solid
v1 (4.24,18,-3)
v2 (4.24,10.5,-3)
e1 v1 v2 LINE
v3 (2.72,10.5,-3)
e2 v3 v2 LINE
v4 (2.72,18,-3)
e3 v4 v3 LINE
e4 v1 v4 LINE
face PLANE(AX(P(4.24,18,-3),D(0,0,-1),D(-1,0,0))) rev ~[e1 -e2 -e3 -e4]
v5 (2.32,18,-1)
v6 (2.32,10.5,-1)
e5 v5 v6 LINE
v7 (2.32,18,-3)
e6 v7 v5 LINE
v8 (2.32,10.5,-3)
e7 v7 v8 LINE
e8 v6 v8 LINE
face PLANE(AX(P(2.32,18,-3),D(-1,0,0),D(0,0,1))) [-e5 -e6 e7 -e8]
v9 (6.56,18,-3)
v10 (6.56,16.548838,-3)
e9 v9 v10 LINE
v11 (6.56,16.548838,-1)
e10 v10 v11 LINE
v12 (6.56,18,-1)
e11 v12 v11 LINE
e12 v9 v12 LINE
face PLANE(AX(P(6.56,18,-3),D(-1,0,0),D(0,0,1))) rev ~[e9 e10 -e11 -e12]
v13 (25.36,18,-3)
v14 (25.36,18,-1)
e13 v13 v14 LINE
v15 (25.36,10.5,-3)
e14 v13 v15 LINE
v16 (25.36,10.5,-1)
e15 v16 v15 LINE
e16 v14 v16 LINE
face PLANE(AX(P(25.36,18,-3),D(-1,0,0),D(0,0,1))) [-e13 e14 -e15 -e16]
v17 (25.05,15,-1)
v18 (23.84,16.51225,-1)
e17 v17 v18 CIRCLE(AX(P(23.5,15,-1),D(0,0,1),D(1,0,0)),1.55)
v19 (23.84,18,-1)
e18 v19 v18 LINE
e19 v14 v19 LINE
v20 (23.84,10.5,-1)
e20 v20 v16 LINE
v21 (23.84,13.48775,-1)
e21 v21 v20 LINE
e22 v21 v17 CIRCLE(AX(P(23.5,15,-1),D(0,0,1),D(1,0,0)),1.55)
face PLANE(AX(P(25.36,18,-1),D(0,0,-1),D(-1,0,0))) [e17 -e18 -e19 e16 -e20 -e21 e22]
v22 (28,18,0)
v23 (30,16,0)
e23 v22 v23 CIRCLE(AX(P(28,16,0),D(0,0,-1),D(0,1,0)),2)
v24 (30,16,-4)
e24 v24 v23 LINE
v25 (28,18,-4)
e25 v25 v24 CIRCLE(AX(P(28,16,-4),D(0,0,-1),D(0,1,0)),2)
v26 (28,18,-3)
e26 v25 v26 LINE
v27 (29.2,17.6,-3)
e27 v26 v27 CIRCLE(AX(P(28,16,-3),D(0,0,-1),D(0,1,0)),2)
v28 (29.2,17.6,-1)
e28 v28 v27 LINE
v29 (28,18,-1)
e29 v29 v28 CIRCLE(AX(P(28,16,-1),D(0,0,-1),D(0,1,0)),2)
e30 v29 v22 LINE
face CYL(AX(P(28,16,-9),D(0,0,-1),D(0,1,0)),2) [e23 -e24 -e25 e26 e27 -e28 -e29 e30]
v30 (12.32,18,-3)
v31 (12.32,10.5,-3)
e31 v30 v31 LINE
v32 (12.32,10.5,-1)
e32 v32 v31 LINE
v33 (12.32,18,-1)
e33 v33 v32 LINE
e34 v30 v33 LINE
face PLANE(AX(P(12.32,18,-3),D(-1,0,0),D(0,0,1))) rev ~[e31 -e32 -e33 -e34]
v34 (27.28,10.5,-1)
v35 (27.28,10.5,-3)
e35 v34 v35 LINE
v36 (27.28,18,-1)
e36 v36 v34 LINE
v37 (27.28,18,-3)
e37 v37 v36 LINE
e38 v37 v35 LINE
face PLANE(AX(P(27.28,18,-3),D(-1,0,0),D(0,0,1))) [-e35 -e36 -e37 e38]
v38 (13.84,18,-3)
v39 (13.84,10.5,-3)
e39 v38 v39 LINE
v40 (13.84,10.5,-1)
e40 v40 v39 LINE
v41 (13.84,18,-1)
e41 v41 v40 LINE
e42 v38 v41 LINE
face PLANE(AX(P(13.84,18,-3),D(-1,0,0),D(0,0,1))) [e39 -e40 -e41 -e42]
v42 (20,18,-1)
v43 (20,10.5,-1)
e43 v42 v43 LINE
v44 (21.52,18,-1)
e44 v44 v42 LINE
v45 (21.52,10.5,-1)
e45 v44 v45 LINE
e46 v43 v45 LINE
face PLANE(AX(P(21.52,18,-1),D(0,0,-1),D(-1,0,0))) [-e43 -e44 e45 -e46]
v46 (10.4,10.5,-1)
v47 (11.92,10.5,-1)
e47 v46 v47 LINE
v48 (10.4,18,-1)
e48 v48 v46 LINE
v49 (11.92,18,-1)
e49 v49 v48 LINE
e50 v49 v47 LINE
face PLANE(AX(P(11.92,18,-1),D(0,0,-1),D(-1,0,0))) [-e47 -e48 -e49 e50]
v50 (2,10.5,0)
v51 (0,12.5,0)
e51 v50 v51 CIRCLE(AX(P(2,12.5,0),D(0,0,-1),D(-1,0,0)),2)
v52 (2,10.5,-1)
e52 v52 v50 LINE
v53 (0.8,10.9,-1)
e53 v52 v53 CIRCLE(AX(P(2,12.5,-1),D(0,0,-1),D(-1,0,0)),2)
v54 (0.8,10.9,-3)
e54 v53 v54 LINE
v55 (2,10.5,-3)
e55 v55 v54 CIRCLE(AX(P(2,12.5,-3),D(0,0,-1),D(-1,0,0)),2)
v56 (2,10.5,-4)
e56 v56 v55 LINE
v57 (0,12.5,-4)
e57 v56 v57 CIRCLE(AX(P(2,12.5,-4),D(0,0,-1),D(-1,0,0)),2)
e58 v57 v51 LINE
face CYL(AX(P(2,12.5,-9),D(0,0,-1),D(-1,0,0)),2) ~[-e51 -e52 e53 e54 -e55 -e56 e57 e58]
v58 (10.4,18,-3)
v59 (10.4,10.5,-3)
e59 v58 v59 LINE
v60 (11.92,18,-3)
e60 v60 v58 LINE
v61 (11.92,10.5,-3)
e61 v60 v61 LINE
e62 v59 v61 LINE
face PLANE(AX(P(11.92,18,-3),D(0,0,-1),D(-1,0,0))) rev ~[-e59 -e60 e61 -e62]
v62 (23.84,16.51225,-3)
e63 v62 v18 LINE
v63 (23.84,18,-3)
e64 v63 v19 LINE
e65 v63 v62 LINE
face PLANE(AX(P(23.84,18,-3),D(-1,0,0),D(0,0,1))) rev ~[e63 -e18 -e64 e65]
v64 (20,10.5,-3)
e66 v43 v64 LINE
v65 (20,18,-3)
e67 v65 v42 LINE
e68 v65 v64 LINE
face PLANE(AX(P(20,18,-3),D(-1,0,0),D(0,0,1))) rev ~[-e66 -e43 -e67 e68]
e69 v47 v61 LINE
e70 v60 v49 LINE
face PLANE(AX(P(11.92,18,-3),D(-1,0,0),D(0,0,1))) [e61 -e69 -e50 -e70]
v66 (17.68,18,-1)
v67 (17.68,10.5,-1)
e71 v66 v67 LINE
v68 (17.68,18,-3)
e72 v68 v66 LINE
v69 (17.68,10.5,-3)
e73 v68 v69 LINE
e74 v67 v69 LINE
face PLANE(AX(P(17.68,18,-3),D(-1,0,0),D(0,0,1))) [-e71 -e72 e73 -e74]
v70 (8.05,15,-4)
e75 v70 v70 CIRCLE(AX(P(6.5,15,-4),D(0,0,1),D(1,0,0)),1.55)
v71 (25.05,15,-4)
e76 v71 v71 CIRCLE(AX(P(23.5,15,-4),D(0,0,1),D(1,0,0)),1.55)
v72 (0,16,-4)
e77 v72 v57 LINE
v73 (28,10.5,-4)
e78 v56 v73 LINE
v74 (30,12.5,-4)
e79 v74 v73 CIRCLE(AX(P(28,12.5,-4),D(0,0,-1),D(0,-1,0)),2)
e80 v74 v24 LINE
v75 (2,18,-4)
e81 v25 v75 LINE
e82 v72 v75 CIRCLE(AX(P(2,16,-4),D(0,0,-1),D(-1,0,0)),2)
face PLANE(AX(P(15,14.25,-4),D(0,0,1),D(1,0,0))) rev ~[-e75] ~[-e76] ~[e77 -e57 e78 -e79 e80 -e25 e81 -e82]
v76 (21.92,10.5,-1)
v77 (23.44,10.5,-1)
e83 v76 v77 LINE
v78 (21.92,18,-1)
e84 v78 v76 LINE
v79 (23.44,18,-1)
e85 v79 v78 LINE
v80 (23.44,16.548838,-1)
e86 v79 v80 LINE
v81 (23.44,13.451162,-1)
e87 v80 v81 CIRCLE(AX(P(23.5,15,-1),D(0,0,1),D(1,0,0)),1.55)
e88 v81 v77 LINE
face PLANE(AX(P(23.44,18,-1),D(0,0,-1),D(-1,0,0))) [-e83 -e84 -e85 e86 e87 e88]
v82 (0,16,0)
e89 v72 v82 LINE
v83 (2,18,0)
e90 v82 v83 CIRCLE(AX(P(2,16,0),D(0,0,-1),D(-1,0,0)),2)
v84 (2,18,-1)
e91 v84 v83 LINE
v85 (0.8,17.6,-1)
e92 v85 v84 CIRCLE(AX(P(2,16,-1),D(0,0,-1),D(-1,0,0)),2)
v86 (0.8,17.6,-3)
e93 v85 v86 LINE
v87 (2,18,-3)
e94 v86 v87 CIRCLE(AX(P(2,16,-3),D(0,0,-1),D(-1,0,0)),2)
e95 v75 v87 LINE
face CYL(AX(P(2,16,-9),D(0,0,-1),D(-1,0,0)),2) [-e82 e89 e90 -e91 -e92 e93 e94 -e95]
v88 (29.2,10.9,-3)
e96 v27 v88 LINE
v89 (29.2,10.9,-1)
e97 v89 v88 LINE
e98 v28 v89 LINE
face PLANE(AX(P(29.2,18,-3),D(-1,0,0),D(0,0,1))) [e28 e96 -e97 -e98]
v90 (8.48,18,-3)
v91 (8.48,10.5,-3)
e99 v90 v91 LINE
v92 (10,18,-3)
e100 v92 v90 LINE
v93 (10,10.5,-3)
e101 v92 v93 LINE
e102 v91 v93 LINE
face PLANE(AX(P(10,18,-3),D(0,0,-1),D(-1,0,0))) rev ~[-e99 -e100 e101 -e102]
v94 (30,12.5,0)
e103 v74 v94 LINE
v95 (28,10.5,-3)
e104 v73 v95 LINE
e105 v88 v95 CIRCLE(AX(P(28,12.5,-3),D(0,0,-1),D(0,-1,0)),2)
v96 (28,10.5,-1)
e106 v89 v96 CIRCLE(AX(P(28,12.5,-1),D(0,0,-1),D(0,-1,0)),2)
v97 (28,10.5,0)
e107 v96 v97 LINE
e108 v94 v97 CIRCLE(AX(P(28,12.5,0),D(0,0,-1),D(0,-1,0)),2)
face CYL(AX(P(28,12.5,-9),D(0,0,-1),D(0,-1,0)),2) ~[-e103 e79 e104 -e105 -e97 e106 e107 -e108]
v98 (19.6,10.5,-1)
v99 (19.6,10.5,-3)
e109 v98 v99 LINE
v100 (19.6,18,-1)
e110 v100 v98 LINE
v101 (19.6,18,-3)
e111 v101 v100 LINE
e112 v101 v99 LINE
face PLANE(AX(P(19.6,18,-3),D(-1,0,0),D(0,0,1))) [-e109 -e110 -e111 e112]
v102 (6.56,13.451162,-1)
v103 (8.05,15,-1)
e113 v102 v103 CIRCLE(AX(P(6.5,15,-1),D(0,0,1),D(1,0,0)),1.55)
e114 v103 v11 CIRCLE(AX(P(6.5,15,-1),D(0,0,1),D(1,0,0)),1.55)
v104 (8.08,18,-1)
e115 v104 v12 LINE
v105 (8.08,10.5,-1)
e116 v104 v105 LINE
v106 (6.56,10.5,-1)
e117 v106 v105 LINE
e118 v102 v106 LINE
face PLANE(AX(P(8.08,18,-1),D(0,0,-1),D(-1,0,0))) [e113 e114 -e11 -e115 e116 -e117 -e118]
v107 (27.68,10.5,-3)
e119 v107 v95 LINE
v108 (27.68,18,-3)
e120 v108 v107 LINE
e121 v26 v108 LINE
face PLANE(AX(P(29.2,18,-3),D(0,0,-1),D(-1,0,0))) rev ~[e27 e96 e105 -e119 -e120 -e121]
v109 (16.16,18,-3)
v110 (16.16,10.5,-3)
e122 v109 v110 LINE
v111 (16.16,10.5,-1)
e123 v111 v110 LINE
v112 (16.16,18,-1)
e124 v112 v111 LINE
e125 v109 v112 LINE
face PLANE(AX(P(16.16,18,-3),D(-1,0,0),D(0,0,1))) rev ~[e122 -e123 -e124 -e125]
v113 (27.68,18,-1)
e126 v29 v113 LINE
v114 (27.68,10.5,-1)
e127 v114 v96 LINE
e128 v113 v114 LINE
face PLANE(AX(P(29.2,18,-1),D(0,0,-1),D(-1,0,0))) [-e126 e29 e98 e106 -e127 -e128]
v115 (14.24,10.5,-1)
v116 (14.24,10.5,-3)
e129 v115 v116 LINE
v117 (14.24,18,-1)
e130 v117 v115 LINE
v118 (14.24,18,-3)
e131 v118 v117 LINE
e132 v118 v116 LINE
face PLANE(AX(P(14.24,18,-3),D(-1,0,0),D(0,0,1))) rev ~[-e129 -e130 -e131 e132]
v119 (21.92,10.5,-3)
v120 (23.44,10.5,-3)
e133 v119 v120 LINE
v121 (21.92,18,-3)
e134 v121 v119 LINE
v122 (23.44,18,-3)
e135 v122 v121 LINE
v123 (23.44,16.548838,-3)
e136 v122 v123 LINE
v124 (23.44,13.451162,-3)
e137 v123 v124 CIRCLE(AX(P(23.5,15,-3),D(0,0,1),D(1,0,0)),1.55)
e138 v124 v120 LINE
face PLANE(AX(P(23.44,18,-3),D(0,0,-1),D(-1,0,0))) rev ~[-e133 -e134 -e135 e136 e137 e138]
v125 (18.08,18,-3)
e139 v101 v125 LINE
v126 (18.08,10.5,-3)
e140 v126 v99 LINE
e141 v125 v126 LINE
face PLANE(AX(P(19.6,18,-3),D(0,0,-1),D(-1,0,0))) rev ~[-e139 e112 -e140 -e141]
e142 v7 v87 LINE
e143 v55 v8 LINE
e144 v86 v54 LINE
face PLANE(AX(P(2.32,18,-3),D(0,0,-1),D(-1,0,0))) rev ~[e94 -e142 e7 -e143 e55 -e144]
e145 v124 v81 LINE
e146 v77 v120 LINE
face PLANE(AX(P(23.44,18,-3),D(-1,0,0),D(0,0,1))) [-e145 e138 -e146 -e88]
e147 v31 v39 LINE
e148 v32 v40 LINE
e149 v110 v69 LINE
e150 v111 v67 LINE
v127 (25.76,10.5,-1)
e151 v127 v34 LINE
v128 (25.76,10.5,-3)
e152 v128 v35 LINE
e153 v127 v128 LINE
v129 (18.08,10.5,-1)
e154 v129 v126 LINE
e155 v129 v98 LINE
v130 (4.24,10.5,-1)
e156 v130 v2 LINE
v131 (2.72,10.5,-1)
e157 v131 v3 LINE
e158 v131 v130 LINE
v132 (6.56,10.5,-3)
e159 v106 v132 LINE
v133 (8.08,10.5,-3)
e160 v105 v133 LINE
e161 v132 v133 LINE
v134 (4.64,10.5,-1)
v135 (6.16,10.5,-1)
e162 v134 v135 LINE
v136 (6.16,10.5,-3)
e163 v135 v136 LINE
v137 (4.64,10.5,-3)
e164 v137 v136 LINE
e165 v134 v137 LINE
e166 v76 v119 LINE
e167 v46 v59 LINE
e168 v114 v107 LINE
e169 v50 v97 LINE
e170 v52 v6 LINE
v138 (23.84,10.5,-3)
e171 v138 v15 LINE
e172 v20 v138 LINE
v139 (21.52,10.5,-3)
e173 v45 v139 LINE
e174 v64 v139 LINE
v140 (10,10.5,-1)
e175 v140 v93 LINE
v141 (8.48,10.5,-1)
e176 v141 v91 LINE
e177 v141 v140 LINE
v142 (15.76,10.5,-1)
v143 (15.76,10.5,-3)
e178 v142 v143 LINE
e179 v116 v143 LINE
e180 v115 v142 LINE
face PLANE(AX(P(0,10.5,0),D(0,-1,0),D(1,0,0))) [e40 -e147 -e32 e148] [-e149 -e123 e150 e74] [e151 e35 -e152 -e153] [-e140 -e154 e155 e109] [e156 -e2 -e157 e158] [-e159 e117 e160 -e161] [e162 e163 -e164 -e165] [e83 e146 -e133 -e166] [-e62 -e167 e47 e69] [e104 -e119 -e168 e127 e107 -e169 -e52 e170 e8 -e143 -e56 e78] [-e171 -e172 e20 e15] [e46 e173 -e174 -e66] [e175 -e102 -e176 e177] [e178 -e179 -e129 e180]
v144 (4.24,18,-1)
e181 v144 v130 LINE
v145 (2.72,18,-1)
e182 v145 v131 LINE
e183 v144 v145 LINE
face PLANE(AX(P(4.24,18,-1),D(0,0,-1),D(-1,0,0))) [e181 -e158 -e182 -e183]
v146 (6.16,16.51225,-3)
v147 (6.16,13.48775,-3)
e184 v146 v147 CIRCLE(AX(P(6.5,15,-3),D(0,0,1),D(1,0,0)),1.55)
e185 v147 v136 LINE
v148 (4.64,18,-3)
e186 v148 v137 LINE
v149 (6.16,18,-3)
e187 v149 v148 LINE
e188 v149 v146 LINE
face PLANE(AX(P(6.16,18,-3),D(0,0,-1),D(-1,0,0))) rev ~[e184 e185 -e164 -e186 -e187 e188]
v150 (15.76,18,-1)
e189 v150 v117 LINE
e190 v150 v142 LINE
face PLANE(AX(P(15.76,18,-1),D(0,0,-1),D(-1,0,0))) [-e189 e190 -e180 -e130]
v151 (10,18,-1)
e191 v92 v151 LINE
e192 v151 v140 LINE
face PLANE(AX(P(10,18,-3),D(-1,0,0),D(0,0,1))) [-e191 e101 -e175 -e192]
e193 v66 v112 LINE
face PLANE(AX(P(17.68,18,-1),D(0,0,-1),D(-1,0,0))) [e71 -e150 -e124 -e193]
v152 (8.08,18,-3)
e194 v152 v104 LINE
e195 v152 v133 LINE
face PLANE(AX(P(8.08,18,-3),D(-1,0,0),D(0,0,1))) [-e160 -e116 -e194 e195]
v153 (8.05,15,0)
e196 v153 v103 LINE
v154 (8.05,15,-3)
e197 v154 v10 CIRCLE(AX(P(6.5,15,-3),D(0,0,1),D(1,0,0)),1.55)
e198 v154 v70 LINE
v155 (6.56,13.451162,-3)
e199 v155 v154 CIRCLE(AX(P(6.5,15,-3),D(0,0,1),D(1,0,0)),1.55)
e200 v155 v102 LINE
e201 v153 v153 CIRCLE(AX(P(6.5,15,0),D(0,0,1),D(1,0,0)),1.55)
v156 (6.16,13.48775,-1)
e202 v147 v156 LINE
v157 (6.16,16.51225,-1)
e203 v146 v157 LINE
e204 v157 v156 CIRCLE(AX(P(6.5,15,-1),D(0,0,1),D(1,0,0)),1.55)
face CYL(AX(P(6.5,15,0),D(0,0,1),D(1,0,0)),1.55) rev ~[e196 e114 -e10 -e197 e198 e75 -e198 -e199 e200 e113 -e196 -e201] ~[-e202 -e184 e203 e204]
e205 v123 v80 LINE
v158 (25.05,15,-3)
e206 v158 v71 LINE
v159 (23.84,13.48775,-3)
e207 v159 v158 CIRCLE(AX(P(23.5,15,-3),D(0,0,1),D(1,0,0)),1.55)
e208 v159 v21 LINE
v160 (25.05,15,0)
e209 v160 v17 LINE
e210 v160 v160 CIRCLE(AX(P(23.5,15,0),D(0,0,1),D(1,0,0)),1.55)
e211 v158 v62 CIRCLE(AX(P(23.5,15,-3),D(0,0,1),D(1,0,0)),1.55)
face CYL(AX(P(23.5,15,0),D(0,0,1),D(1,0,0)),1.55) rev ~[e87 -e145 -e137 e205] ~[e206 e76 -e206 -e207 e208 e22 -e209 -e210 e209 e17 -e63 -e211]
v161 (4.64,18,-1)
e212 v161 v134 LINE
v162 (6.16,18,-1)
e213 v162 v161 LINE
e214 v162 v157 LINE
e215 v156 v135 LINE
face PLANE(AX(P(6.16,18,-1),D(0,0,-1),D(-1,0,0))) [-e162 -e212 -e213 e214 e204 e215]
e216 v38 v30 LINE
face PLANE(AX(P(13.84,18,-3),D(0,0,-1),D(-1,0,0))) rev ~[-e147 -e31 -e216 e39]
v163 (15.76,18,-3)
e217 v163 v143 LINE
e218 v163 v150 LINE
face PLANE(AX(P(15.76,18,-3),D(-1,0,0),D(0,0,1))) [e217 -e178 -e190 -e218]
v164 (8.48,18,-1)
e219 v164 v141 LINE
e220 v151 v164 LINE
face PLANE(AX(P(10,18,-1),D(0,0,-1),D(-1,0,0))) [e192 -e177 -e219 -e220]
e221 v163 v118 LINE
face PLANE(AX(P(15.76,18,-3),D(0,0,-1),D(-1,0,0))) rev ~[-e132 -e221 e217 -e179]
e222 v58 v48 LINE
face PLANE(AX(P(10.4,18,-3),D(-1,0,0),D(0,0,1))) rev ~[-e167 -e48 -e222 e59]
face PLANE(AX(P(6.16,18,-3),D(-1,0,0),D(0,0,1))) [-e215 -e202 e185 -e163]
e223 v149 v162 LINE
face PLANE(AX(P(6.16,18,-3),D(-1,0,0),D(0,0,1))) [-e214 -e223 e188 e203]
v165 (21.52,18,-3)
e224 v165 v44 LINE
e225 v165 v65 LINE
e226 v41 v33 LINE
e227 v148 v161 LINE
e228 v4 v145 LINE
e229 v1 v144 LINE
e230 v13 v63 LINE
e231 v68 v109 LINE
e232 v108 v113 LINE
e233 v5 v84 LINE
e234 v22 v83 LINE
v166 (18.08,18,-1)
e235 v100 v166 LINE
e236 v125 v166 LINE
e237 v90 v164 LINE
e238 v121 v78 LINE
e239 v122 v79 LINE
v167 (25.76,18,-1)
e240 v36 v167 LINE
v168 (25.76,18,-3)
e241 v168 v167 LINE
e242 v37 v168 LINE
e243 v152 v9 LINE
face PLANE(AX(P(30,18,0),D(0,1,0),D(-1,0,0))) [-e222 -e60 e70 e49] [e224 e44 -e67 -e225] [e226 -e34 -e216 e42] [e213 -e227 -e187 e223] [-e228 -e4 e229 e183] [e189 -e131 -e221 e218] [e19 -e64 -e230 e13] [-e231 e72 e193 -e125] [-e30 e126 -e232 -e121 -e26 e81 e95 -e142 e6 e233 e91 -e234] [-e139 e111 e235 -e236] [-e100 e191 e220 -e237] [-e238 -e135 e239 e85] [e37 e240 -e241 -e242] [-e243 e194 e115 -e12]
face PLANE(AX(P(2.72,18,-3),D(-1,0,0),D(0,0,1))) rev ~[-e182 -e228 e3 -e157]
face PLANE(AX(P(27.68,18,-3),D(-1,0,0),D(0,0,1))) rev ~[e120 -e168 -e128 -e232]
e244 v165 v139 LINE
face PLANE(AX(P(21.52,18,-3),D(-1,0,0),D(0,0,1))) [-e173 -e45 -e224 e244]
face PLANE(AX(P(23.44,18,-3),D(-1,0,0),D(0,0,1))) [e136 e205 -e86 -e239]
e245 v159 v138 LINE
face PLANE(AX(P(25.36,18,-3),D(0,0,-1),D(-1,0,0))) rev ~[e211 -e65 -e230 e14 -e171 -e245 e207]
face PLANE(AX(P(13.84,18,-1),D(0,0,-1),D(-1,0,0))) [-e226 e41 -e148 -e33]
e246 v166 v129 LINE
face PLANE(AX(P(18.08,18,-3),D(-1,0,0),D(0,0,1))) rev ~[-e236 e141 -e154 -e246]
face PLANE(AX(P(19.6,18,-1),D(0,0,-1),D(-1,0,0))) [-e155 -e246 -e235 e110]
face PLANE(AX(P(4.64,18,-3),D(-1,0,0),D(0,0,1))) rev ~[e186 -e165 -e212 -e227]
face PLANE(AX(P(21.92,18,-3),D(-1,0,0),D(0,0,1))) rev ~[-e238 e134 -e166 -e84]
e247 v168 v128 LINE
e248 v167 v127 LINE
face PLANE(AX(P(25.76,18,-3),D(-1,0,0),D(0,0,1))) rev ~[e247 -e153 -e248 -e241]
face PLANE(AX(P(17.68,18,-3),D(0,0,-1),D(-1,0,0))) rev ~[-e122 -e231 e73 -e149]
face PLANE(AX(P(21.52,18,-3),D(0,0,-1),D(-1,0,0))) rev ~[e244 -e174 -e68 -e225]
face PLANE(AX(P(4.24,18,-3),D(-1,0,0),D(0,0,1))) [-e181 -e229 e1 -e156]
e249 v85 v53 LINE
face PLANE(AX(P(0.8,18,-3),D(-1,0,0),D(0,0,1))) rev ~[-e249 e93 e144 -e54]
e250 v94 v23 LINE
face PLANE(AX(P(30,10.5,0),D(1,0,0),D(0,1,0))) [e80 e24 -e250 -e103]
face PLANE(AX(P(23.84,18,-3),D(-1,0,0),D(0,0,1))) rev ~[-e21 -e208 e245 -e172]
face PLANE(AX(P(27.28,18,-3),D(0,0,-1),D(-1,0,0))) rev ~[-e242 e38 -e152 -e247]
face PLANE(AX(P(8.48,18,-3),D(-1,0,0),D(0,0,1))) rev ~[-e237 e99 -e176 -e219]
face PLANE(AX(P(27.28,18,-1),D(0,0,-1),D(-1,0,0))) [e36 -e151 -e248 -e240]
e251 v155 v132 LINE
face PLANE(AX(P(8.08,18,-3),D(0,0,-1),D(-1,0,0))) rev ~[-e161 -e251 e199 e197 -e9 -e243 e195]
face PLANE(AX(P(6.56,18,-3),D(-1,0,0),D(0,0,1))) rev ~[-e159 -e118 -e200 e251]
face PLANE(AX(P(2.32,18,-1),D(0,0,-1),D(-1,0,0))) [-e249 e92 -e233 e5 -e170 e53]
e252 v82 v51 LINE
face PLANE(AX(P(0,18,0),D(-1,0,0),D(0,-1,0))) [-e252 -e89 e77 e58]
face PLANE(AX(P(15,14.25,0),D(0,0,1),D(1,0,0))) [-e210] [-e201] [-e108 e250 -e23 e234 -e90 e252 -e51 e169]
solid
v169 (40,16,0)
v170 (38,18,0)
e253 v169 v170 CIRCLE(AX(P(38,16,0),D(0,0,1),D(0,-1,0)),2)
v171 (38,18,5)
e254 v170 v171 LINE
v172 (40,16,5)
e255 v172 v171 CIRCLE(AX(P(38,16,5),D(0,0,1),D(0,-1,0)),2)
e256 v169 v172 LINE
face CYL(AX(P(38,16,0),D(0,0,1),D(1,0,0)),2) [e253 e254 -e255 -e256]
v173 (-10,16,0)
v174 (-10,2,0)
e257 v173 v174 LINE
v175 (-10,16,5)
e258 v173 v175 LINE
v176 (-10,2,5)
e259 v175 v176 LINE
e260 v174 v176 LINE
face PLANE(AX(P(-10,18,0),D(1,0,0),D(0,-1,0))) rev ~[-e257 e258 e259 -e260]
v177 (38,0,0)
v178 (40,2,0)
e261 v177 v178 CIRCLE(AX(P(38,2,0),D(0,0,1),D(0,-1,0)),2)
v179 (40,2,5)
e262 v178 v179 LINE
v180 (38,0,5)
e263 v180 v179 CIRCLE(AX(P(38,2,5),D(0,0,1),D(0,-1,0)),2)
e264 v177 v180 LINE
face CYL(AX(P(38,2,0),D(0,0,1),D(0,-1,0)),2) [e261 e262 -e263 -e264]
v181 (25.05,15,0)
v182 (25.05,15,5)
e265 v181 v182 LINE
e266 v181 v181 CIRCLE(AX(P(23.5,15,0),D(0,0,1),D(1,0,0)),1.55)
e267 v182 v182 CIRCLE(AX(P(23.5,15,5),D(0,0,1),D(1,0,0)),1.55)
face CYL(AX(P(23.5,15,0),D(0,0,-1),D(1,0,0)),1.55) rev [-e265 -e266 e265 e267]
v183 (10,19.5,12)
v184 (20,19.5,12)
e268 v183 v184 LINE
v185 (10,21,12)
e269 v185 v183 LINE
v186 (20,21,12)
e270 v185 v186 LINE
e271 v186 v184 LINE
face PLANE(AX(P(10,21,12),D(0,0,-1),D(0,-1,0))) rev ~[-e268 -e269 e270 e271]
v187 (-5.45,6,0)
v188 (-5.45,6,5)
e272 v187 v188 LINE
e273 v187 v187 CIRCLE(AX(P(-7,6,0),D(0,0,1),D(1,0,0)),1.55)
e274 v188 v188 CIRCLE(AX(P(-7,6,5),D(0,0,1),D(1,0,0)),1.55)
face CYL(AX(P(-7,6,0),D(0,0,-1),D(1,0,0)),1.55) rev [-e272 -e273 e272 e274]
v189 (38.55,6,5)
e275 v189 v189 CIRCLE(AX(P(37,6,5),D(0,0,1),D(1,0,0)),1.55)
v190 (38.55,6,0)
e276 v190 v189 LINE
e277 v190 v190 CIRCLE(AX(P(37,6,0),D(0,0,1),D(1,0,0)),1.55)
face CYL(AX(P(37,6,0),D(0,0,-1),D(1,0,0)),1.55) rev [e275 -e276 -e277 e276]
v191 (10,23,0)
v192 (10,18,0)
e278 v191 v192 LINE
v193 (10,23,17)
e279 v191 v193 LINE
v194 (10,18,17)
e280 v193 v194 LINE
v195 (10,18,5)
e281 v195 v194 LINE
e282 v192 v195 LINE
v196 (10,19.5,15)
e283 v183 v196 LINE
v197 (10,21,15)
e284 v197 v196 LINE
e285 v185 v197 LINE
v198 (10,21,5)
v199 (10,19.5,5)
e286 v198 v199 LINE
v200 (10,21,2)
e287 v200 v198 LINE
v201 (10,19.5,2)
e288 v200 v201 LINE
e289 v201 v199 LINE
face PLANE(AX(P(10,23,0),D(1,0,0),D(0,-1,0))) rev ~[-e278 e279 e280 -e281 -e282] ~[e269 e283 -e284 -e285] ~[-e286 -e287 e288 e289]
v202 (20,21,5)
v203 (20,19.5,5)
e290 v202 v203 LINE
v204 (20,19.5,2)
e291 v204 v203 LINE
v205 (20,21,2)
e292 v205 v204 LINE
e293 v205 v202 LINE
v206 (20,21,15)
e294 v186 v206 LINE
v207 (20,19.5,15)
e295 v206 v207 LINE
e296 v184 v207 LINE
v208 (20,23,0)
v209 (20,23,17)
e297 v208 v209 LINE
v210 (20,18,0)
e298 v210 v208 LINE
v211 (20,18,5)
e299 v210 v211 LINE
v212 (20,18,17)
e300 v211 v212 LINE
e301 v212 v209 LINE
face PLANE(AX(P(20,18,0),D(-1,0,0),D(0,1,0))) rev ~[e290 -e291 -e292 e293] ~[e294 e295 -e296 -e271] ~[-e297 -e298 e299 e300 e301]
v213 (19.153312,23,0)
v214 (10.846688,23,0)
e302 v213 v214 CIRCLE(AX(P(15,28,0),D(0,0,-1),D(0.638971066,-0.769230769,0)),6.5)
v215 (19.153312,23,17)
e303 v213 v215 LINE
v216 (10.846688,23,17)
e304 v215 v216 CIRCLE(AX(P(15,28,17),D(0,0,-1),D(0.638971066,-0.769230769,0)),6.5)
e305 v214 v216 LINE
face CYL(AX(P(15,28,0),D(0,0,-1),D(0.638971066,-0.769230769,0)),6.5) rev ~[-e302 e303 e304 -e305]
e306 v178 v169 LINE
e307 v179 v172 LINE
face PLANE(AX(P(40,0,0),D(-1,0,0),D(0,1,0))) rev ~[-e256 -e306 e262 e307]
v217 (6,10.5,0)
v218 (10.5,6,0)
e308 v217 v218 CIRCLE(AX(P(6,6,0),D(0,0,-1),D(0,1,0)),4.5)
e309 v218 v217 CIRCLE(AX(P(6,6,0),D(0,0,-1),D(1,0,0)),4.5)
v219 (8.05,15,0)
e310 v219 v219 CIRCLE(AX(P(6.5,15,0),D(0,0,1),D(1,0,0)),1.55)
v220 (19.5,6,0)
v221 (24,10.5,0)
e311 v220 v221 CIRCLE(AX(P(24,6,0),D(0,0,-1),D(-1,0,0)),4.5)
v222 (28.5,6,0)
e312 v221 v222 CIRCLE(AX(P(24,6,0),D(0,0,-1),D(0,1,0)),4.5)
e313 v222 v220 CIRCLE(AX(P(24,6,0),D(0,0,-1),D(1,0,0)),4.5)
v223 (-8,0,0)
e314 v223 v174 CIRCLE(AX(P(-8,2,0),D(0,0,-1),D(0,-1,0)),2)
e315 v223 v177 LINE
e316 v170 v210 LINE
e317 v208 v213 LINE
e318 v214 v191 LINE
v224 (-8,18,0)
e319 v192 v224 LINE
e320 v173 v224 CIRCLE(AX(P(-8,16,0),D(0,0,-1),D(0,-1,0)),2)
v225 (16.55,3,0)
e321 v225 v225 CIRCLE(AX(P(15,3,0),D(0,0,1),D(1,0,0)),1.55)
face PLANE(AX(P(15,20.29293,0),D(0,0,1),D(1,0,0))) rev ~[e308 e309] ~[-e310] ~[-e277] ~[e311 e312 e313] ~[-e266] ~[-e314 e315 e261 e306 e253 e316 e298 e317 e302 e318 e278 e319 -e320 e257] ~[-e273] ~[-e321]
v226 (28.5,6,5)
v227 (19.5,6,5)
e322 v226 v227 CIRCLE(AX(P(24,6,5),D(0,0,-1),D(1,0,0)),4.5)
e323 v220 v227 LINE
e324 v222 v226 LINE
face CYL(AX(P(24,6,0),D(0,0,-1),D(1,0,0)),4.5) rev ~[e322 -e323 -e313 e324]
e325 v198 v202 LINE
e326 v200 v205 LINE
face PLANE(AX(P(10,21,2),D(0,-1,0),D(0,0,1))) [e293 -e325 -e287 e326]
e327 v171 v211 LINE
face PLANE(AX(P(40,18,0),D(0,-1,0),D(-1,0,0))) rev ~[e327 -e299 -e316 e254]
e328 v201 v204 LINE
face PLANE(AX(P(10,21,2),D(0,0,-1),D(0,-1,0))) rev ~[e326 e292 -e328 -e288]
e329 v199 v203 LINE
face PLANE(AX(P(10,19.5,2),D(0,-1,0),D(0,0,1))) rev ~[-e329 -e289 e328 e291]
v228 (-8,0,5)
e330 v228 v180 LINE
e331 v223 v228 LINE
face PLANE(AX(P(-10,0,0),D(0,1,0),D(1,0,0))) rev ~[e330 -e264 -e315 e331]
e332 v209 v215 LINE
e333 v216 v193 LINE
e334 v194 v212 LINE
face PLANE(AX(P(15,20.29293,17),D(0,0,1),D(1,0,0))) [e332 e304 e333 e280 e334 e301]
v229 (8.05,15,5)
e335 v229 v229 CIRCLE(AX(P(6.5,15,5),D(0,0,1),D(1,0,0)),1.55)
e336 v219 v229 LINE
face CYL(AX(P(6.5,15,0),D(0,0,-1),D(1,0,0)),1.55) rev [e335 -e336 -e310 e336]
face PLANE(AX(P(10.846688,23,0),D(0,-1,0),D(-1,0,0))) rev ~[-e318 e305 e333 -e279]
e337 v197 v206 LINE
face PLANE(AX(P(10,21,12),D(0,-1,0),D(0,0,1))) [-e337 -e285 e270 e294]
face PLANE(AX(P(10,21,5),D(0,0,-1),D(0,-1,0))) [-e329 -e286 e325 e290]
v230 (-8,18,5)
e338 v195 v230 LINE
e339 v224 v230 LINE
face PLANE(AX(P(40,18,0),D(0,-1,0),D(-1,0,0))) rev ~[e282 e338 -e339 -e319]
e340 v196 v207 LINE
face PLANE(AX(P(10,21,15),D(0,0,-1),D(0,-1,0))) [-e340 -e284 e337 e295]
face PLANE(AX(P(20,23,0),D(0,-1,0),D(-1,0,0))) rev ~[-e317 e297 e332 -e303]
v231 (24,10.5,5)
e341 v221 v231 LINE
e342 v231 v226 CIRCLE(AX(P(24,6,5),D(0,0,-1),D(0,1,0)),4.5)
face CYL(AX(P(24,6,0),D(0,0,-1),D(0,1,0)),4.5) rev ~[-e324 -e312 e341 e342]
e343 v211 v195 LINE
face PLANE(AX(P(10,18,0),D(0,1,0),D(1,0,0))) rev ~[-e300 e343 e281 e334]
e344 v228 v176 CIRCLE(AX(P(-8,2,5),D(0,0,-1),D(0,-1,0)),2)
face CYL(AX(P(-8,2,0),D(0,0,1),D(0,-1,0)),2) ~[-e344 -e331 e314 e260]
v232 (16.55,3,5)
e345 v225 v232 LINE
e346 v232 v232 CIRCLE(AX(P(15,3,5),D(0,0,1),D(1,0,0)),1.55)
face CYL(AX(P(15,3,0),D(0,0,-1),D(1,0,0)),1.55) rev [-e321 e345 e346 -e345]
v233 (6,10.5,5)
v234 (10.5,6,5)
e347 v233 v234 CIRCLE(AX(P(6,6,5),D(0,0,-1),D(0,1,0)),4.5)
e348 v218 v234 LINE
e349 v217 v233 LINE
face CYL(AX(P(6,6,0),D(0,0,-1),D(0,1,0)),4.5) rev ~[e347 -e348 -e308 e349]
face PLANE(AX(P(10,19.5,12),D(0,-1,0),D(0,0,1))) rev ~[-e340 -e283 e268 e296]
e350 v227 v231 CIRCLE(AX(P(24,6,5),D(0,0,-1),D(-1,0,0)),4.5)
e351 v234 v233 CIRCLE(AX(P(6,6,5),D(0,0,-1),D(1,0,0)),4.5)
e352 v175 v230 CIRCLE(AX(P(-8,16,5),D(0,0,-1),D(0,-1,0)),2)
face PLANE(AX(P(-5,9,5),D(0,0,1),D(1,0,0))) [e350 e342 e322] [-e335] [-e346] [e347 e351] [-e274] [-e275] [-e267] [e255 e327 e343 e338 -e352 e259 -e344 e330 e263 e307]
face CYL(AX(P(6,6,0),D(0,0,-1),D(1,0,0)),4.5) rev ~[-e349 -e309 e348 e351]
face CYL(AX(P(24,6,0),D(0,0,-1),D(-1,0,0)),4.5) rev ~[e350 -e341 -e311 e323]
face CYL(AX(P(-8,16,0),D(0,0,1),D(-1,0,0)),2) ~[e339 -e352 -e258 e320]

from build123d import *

# Parameters (mm, degrees)
F0_R          = 1.55
F1_DEPTH      = 5
F2_DEPTH      = 4
F3_DEPTH      = 17
F4_W          = 1.5
F4_H          = 3
F5_DEPTH      = 25
F6_W          = 1.52
F6_H          = 2
F7_DEPTH      = 11
F8_F1_R       = 2
F8_F2_R       = 2
F8_F3_R       = 2
F8_F4_R       = 2
F8_2_T1_DEPTH = 14


# Not quite as in the source:
# - a fillet or chamfer that OpenCascade refuses, or shapes differently, is made with other operations: its cross-section is extruded or revolved along the edge and cut away or added
# - a feature names something its author has since deleted; it is built from what else it names


with BuildPart() as f1:
    # F0 (on Top) → F1 (new body)
    with BuildSketch(Plane.XY):
        Polygon((-10, 0), (0, 0), (0, 10.5), (0, 18), (-10, 18), align=None)
        with Locations((-7, 6)):
            Circle(F0_R, mode=Mode.SUBTRACT)
        with BuildLine():
            Line((0, 10.5), (0, 0))
            Line((0, 0), (10.5, 0))
            Line((10.5, 0), (10.5, 6))
            ThreePointArc((10.5, 6), (2.8180194847, 2.8180194847), (6, 10.5))
            Line((6, 10.5), (0, 10.5))
        make_face()
        with BuildLine():
            Line((10.5, 6), (10.5, 0))
            Line((10.5, 0), (19.5, 0))
            Line((19.5, 0), (19.5, 6))
            ThreePointArc((19.5, 6), (20.8180194847, 9.1819805153), (24, 10.5))
            Line((24, 10.5), (6, 10.5))
            ThreePointArc((6, 10.5), (9.1819805153, 9.1819805153), (10.5, 6))
        make_face()
        with Locations((15, 3)):
            Circle(F0_R, mode=Mode.SUBTRACT)
        with BuildLine():
            Line((19.5, 6), (19.5, 0))
            Line((19.5, 0), (30, 0))
            Line((30, 0), (30, 10.5))
            Line((30, 10.5), (24, 10.5))
            ThreePointArc((24, 10.5), (27.1819805153, 9.1819805153), (28.5, 6))
            ThreePointArc((28.5, 6), (24, 1.5), (19.5, 6))
        make_face()
        Polygon((30, 10.5), (30, 0), (40, 0), (40, 18), (30, 18), align=None)
        with Locations((37, 6)):
            Circle(F0_R, mode=Mode.SUBTRACT)
        Polygon((0, 18), (0, 10.5), (6, 10.5), (24, 10.5), (30, 10.5), (30, 18), (20, 18), (10, 18), align=None)
        with Locations((6.5, 15)):
            Circle(F0_R, mode=Mode.SUBTRACT)
        with Locations((23.5, 15)):
            Circle(F0_R, mode=Mode.SUBTRACT)
    extrude(amount=F1_DEPTH)

    # F0 (on Top) → F3 (join)
    with BuildSketch(Plane.XY):
        with BuildLine():
            Line((10, 23), (10, 18))
            Line((10, 18), (20, 18))
            Line((20, 18), (20, 23))
            Line((20, 23), (19.1533119315, 23))
            ThreePointArc((19.1533119315, 23), (15, 21.5), (10.8466880685, 23))
            Line((10.8466880685, 23), (10, 23))
        make_face()
    extrude(amount=F3_DEPTH)

    # F4 (on face) → F5 (cut)
    with BuildSketch(Plane(origin=(10, 0, 0), x_dir=(0, -1, 0), z_dir=(-1, 0, 0))):
        with Locations((-20.25, 3.5)):
            Rectangle(F4_W, F4_H)
        with Locations((-20.25, 13.5)):
            Rectangle(F4_W, F4_H)
    extrude(amount=-F5_DEPTH, mode=Mode.SUBTRACT)

    # F8: fillet of radius 2 on 4 edges, made by hand

    # F8_f1
    f8_f1_edges = [f1.edges().sort_by_distance(p)[0] for p in [
        (40, 0, 2.5),
    ]]
    fillet(f8_f1_edges, radius=F8_F1_R)

    # F8_f2
    f8_f2_edges = [f1.edges().sort_by_distance(p)[0] for p in [
        (40, 18, 2.5),
    ]]
    fillet(f8_f2_edges, radius=F8_F2_R)

    # F8_f3
    f8_f3_edges = [f1.edges().sort_by_distance(p)[0] for p in [
        (-10, 0, 2.5),
    ]]
    fillet(f8_f3_edges, radius=F8_F3_R)

    # F8_f4
    f8_f4_edges = [f1.edges().sort_by_distance(p)[0] for p in [
        (-10, 18, 2.5),
    ]]
    fillet(f8_f4_edges, radius=F8_F4_R)


with BuildPart() as f2:
    # F0 (on Top) → F2 (new body)
    with BuildSketch(Plane.XY):
        Polygon((0, 18), (0, 10.5), (6, 10.5), (24, 10.5), (30, 10.5), (30, 18), (20, 18), (10, 18), align=None)
        with Locations((6.5, 15)):
            Circle(F0_R, mode=Mode.SUBTRACT)
        with Locations((23.5, 15)):
            Circle(F0_R, mode=Mode.SUBTRACT)
    extrude(amount=-F2_DEPTH)

    # F6 (on face) → F7 (cut)
    with BuildSketch(Plane(origin=(0, 18, 0), x_dir=(-1, 0, 0), z_dir=(0, 1, 0))):
        with Locations((-3.48, -2)):
            Rectangle(F6_W, F6_H)
        with Locations((-5.4, -2)):
            Rectangle(F6_W, F6_H)
        with Locations((-7.32, -2)):
            Rectangle(F6_W, F6_H)
        with Locations((-9.24, -2)):
            Rectangle(F6_W, F6_H)
        with Locations((-11.16, -2)):
            Rectangle(F6_W, F6_H)
        with Locations((-13.08, -2)):
            Rectangle(F6_W, F6_H)
        with Locations((-15, -2)):
            Rectangle(F6_W, F6_H)
        with Locations((-16.92, -2)):
            Rectangle(F6_W, F6_H)
        with Locations((-18.84, -2)):
            Rectangle(F6_W, F6_H)
        with Locations((-20.76, -2)):
            Rectangle(F6_W, F6_H)
        with Locations((-22.68, -2)):
            Rectangle(F6_W, F6_H)
        with Locations((-24.6, -2)):
            Rectangle(F6_W, F6_H)
        with Locations((-26.52, -2)):
            Rectangle(F6_W, F6_H)
        with Locations((-28.44, -2)):
            Rectangle(F6_W, F6_H)
        with Locations((-1.56, -2)):
            Rectangle(F6_W, F6_H)
    extrude(amount=-F7_DEPTH, mode=Mode.SUBTRACT)

    # F8#2: fillet of radius 2 on 4 edges, made by hand

    # F8_2_s2 → F8_2_t1 (cut)
    with BuildSketch(Plane.XY.offset(-9)):
        with BuildLine():
            ThreePointArc((0, 16), (0.5857864376, 17.4142135624), (2, 18))
            Line((2, 18), (0, 18))
            Line((0, 18), (0, 16))
        make_face()
        with BuildLine():
            ThreePointArc((28, 18), (29.4142135624, 17.4142135624), (30, 16))
            Line((30, 16), (30, 18))
            Line((30, 18), (28, 18))
        make_face()
        with BuildLine():
            ThreePointArc((28, 10.5), (29.4142135624, 11.0857864376), (30, 12.5))
            Line((30, 12.5), (30, 10.5))
            Line((30, 10.5), (28, 10.5))
        make_face()
        with BuildLine():
            ThreePointArc((0, 12.5), (0.5857864376, 11.0857864376), (2, 10.5))
            Line((2, 10.5), (0, 10.5))
            Line((0, 10.5), (0, 12.5))
        make_face()
    extrude(amount=F8_2_T1_DEPTH, mode=Mode.SUBTRACT)


solid = Compound([f1.part, f2.part])
